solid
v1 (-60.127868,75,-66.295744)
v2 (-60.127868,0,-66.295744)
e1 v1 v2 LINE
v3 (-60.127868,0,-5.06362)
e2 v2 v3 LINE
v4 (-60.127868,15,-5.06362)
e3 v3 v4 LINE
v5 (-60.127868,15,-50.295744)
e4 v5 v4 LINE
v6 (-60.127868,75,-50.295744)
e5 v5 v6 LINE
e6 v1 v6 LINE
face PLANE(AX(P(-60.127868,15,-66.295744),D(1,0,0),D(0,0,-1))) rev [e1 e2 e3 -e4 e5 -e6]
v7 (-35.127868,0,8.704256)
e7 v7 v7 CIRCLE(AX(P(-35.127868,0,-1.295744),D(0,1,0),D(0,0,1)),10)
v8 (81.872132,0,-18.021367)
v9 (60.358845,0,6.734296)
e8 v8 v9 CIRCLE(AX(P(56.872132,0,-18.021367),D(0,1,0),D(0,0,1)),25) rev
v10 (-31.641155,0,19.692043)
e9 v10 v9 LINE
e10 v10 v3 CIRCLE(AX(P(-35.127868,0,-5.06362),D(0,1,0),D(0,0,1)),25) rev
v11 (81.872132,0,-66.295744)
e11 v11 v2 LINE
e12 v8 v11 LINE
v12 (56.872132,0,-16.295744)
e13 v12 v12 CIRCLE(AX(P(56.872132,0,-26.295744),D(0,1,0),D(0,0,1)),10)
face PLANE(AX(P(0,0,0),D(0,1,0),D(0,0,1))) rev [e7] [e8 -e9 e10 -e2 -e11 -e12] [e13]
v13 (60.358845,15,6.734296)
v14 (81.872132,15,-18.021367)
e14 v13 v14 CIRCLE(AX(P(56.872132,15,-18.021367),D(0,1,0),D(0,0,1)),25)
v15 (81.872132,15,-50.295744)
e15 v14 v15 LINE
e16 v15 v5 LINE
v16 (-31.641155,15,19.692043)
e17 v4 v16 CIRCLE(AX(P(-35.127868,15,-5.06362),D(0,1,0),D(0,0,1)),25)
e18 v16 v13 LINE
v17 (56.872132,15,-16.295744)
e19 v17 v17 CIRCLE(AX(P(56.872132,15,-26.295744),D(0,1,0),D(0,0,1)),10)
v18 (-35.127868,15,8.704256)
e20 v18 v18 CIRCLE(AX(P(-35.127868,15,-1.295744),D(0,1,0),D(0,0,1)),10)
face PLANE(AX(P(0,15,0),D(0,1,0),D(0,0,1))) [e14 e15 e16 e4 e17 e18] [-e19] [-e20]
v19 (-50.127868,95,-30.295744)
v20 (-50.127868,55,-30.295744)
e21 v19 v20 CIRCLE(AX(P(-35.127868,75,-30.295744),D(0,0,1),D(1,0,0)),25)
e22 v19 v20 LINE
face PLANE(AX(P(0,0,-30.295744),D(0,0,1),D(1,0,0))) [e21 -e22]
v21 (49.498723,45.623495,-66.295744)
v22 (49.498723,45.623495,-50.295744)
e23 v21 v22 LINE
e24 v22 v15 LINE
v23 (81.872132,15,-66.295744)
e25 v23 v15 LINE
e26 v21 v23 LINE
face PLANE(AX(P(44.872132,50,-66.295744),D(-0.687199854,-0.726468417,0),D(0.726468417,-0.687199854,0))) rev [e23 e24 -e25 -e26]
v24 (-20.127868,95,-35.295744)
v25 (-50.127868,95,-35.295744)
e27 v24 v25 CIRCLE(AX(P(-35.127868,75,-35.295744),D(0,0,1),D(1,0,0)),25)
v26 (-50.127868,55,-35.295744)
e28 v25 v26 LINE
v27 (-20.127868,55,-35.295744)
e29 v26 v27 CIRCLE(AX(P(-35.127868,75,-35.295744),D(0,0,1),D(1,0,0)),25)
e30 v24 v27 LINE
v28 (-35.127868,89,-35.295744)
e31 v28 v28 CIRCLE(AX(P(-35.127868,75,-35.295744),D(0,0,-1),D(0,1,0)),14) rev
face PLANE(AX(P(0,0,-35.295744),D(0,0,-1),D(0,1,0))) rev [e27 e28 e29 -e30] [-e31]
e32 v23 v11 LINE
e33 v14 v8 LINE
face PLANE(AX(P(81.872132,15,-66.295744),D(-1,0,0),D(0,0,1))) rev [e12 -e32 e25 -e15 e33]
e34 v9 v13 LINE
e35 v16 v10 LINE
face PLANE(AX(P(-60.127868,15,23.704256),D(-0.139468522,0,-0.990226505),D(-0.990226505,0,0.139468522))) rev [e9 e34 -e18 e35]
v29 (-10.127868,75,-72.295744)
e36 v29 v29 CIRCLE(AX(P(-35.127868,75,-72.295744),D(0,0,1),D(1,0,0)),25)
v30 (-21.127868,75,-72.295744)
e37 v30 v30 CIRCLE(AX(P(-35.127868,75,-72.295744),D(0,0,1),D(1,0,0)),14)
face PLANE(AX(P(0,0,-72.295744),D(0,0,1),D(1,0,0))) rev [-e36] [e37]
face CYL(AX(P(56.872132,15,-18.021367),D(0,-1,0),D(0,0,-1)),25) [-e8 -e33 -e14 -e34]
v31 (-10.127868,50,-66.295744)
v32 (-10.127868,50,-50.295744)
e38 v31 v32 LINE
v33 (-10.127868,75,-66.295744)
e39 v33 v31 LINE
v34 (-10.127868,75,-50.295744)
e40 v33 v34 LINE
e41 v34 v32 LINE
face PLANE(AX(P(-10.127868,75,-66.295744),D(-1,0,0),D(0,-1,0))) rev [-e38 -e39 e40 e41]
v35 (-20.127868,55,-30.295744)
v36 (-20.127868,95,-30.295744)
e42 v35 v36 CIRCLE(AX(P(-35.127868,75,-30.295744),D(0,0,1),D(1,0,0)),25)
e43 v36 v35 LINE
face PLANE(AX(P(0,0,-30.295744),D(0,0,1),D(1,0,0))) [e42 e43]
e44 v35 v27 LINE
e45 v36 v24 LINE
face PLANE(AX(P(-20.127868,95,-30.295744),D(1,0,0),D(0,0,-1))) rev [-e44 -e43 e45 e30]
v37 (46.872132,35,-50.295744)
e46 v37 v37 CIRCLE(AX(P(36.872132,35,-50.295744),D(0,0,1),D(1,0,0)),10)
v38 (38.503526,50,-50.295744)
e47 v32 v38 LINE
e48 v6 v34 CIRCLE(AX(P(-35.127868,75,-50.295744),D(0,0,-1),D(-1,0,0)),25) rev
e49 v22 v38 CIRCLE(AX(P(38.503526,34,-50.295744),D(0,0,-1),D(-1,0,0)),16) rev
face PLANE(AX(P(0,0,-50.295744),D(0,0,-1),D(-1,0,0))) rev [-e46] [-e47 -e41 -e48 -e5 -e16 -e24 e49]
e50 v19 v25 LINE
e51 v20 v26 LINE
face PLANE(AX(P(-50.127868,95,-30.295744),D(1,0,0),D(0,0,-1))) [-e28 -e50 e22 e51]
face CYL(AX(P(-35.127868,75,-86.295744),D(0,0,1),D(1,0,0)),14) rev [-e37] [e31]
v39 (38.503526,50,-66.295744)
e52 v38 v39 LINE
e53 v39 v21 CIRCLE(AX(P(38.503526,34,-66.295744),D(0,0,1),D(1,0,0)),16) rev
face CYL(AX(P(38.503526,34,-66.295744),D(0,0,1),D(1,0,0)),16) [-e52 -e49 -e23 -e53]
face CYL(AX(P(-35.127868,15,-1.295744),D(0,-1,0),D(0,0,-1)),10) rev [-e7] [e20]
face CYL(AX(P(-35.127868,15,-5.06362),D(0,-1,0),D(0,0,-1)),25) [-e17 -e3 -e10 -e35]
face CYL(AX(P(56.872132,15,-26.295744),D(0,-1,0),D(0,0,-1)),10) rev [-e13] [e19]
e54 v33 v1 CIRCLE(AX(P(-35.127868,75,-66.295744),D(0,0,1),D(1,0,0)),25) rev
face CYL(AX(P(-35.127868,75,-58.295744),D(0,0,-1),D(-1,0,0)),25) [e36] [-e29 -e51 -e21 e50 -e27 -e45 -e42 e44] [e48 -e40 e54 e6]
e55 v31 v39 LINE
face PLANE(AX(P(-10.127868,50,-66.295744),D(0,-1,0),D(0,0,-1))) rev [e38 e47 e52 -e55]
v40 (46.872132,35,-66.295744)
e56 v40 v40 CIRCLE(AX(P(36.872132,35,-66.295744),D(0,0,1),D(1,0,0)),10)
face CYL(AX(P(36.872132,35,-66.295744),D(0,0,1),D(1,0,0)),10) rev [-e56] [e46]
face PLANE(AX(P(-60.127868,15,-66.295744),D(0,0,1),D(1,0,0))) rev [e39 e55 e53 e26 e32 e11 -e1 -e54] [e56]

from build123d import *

# Parameters (mm, degrees)
SKETCH1_R               = 10
BOSS_EXTRUDE2_DEPTH     = 15
FILLET3_R               = 25
F_3DSKETCH1_R           = 10
BOSS_EXTRUDE5_DEPTH     = 16
FILLET5_R               = 16
BOSS_EXTRUDE6_START     = -72.295744394
BOSS_EXTRUDE6_OUTLINE_R = 25
BOSS_EXTRUDE6_DEPTH     = 42
SKETCH2_R               = 14
CUT_EXTRUDE1_DEPTH      = 56
CUT_EXTRUDE2_START      = -5
CUT_EXTRUDE2_DEPTH      = 5


# Read off the part's stored shape, not the designer's step: Boss-Extrude6
with BuildPart() as part:
    # Sketch1 → Boss-Extrude2 (new body)
    with BuildSketch(Plane(origin=(0, 0, 0), x_dir=(1, 0, 0), z_dir=(0, 1, 0))):
        Polygon((-60.127867878, 66.295744394), (81.872132122, 66.295744394), (81.872132122, -3.704255606), (-60.127867878, -23.704255606), align=None)
        with Locations(Location((-35.127867878, 1.295744394, 0), (0, 0, 270))):
            Circle(SKETCH1_R, mode=Mode.SUBTRACT)
        with Locations(Location((56.872132122, 26.295744394, 0), (0, 0, 270))):
            Circle(SKETCH1_R, mode=Mode.SUBTRACT)
    extrude(amount=BOSS_EXTRUDE2_DEPTH)

    # Fillet3
    fillet3_edges = [part.edges().sort_by_distance(p)[0] for p in [
        (81.872132122, 7.5, 3.704255606),
        (-60.127867878, 7.5, 23.704255606),
    ]]
    fillet(fillet3_edges, radius=FILLET3_R)

    # 3DSketch1 → Boss-Extrude5 (add)
    with BuildSketch(Plane(origin=(-60.127867878, 15, -66.295744394), x_dir=(1, 0, 0), z_dir=(0, 0, 1))):
        Polygon((0, 0), (142, 0), (105, 35), (50, 35), (50, 60), (0, 60), align=None)
        with Locations((97, 20)):
            Circle(F_3DSKETCH1_R, mode=Mode.SUBTRACT)
    extrude(amount=BOSS_EXTRUDE5_DEPTH)

    # Fillet5
    fillet5_edges = [part.edges().sort_by_distance(p)[0] for p in [
        (44.872132122, 50, -58.295744394),
    ]]
    fillet(fillet5_edges, radius=FILLET5_R)

    # Boss-Extrude6 outline → Boss-Extrude6 (add)
    with BuildSketch(Plane.XY.offset(BOSS_EXTRUDE6_START)):
        with Locations((-35.127867878, 75)):
            Circle(BOSS_EXTRUDE6_OUTLINE_R)
    extrude(amount=BOSS_EXTRUDE6_DEPTH)

    # Sketch2 → Cut-Extrude1 (cut)
    with BuildSketch(Plane.XY.offset(-30.295744394)):
        with Locations((-35.127867878, 75)):
            Circle(SKETCH2_R)
    extrude(amount=-CUT_EXTRUDE1_DEPTH, mode=Mode.SUBTRACT)

    # 3DSketch3 → Cut-Extrude2 (cut)
    with BuildSketch(Plane(origin=(-20.127867878, 95, -30.295744394), x_dir=(-0.5999999999999998, -0.8000000000000002, 0), z_dir=(0, 0, 1)).offset(CUT_EXTRUDE2_START)):
        with BuildLine():
            Line((0, 0), (32, 24))
            ThreePointArc((32, 24), (45, 15), (50, 0))
            Line((50, 0), (18, -24))
            ThreePointArc((18, -24), (5, -15), (0, 0))
        make_face()
    extrude(amount=CUT_EXTRUDE2_DEPTH, mode=Mode.SUBTRACT)


solid = part.part
